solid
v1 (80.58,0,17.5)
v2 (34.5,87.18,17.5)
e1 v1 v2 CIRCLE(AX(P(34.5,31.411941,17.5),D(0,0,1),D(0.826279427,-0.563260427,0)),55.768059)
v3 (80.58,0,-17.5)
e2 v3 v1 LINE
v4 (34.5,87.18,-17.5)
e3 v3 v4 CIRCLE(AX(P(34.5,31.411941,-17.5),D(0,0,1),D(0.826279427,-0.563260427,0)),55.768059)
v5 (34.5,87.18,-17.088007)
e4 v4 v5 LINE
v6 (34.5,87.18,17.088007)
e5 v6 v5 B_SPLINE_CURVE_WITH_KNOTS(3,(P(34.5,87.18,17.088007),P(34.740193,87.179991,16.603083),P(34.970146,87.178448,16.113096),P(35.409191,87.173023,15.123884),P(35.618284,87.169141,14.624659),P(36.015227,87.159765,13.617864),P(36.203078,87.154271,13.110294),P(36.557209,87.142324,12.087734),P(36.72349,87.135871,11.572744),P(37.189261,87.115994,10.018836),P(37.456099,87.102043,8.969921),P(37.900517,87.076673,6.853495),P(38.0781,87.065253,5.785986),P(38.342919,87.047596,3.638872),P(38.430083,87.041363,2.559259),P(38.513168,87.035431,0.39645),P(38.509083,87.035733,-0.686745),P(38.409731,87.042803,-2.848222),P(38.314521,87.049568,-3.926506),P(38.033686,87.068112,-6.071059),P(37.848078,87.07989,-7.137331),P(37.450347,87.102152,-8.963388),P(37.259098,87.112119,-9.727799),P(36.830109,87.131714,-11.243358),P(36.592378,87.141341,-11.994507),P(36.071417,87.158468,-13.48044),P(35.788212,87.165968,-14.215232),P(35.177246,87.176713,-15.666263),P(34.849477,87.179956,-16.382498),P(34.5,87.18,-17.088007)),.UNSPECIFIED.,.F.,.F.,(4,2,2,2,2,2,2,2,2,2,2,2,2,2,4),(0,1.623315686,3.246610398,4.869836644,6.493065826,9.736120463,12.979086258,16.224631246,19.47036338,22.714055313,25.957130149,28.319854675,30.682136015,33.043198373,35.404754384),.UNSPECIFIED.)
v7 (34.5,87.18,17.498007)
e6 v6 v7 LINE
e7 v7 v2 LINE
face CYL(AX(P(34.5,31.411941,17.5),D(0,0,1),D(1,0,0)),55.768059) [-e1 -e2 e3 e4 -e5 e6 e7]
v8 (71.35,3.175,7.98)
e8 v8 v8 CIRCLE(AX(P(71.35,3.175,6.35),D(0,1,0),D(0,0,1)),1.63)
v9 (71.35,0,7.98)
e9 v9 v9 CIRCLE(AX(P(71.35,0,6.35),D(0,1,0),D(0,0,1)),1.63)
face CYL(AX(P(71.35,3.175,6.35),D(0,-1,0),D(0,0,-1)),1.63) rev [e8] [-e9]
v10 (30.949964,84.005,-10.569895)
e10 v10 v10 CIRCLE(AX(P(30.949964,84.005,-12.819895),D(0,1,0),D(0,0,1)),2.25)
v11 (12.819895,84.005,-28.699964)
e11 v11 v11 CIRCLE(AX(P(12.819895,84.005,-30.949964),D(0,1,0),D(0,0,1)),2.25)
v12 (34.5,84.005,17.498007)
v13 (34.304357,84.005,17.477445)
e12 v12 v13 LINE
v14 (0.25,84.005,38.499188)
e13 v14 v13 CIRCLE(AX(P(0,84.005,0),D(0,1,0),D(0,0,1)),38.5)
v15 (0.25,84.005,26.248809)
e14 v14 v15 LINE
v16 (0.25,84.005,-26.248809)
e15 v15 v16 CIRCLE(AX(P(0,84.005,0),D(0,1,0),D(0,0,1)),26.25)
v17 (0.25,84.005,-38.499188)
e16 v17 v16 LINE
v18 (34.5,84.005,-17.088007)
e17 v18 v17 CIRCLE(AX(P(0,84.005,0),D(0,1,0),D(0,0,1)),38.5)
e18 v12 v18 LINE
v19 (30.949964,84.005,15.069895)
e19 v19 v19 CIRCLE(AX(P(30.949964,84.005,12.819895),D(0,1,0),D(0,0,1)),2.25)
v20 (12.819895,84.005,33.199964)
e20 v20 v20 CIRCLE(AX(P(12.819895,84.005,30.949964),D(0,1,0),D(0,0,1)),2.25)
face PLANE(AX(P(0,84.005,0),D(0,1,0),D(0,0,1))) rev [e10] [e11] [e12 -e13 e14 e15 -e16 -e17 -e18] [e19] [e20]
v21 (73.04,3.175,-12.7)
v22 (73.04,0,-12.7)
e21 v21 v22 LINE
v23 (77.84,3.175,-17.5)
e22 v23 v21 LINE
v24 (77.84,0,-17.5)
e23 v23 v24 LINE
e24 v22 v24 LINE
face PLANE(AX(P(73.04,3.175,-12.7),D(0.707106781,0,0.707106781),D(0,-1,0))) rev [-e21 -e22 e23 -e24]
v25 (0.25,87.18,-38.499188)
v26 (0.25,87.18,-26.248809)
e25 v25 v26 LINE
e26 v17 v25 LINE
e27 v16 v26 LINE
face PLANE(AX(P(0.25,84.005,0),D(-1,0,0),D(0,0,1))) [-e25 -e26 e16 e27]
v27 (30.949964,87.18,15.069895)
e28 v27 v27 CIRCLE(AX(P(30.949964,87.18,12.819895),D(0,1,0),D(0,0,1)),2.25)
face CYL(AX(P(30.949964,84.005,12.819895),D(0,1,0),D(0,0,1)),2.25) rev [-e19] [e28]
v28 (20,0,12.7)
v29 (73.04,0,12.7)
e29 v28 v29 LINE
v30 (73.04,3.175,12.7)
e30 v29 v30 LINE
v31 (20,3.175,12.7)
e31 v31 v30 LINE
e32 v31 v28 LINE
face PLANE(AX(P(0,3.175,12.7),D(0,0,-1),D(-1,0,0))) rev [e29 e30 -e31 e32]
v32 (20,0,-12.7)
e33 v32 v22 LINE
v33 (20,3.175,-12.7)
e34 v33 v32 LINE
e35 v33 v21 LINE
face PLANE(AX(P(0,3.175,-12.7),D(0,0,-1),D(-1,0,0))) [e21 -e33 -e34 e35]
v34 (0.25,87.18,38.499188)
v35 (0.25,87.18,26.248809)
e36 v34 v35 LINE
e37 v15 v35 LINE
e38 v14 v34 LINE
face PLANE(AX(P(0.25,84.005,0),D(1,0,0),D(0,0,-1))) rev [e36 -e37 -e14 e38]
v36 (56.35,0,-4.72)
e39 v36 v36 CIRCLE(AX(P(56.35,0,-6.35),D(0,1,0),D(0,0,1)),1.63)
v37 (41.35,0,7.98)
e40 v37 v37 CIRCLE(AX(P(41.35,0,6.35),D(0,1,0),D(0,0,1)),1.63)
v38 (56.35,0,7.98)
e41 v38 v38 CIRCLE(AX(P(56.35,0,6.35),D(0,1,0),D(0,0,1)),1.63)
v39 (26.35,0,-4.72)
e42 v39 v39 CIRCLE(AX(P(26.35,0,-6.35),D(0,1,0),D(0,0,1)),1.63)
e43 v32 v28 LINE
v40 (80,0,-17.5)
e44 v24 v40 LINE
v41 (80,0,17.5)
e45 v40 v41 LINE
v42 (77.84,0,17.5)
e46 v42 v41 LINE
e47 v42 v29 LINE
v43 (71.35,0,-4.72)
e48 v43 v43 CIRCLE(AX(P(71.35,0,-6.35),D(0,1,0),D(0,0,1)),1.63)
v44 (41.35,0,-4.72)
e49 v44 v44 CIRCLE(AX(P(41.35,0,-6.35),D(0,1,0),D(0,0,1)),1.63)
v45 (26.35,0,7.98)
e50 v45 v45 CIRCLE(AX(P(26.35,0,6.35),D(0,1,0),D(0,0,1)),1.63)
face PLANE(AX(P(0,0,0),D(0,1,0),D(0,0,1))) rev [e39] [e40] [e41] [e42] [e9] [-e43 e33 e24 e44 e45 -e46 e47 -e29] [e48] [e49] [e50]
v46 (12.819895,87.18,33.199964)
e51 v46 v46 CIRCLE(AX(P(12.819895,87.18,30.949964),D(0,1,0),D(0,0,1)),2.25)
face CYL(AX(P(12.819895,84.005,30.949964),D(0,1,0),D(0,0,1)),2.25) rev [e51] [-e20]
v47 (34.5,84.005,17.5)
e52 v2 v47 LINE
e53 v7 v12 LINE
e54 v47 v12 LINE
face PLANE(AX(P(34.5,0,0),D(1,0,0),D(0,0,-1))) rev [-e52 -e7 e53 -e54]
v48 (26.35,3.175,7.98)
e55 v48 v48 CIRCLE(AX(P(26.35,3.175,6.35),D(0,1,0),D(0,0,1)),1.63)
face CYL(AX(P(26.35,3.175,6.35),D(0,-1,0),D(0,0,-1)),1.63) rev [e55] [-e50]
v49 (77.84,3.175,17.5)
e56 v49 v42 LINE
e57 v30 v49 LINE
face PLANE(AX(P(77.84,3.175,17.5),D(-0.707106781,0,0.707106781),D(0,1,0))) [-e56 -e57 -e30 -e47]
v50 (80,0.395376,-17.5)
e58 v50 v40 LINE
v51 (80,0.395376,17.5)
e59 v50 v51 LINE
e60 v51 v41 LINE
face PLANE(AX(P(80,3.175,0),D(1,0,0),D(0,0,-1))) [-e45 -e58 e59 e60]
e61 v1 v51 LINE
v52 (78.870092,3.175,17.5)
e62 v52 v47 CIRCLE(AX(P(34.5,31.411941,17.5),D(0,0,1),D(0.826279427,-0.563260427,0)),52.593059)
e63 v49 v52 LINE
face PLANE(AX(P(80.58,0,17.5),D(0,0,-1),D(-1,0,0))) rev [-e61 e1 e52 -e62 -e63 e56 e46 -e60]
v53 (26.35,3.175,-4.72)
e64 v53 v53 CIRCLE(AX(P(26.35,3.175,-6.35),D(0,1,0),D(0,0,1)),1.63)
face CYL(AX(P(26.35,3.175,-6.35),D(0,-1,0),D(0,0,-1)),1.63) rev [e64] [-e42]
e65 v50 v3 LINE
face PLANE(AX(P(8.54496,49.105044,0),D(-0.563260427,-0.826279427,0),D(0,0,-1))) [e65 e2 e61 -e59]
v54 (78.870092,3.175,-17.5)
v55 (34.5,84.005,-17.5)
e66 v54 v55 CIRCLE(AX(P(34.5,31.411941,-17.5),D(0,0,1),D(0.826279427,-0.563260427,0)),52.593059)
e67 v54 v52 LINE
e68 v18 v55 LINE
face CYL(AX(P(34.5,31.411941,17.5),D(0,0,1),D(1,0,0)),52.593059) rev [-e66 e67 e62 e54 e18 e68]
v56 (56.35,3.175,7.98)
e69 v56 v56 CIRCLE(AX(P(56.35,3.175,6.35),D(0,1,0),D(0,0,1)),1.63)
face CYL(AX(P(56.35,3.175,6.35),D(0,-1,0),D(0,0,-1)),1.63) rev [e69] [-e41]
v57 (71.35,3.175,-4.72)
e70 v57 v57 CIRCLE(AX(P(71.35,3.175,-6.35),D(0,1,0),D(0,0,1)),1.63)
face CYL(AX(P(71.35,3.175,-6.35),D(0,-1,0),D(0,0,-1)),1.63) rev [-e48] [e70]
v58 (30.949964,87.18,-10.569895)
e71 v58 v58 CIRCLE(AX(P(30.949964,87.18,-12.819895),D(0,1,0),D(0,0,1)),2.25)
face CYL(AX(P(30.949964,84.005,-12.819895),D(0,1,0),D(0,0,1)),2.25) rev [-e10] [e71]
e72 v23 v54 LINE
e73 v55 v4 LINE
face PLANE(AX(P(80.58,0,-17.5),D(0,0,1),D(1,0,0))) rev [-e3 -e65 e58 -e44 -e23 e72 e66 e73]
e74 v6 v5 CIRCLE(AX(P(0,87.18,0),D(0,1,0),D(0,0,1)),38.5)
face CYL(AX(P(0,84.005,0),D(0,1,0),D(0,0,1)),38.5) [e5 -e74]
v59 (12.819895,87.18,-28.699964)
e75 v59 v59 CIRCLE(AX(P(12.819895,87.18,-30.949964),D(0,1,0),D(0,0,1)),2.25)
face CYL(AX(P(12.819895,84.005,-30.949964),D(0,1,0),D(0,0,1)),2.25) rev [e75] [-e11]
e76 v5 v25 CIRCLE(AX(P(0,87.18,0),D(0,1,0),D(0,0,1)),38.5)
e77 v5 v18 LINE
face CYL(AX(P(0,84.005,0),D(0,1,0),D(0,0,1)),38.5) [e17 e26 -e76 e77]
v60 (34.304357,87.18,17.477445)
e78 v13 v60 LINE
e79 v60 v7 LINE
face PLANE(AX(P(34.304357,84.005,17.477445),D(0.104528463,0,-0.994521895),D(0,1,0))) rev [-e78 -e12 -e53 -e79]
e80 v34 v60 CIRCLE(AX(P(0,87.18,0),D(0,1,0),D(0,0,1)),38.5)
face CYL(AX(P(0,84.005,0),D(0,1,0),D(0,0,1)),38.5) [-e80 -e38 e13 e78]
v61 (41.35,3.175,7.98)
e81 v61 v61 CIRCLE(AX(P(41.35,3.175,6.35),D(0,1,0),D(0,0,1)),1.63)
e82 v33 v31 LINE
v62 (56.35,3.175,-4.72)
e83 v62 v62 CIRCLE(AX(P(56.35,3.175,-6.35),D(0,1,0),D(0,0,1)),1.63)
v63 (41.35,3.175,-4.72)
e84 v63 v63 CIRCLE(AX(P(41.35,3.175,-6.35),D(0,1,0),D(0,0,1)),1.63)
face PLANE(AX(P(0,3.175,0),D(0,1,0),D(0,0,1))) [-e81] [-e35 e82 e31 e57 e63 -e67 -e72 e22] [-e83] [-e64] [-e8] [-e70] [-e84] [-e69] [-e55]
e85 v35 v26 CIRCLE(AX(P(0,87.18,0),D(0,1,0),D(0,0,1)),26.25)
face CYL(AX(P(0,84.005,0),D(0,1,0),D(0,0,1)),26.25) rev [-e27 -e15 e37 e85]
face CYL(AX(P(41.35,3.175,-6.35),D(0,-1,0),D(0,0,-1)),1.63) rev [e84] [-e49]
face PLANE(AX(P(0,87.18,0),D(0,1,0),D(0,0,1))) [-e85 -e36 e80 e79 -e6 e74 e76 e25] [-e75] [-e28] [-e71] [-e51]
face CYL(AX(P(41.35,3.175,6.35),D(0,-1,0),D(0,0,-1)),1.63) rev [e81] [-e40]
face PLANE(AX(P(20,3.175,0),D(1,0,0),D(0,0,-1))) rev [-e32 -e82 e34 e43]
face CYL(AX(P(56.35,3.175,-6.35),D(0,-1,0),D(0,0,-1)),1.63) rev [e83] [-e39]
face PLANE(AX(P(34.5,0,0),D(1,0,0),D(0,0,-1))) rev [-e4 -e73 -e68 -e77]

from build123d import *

# Parameters (mm, degrees)
SKETCH2_R               = 2.25
BOSS_EXTRUDE1_DEPTH     = 3.175
SKETCH1_W               = 2.16
SKETCH1_H               = 4.8
SKETCH1_H_2             = 25.4
SKETCH1_W_2             = 57.84
SKETCH1_R               = 1.63
BOSS_EXTRUDE2_DEPTH     = 3.175
TOP_CONNECTION_SKETCH_W = 35
TOP_CONNECTION_SKETCH_H = 3.175
CHAMFER1_SIZE           = 4.8
CHAMFER2_SIZE           = 0.41
CHAMFER2_SIZE_2         = 0.434896144


# Some blends are built 0.0001 mm under size
with BuildPart() as part:
    # Sketch2 → Boss-Extrude1 (new body)
    with BuildSketch(Plane(origin=(0, 87.18, 0), x_dir=(1, 0, 0), z_dir=(0, 1, 0))):
        with BuildLine():
            ThreePointArc((38.5, 0), (27.3118564, 27.135078773), (0.25, 38.499188303))
            Line((0.25, 38.499188303), (0.25, 26.248809497))
            ThreePointArc((0.25, 26.248809497), (18.649731902, 18.472953202), (26.25, 0))
            ThreePointArc((26.25, 0), (18.649731902, -18.472953202), (0.25, -26.248809497))
            Line((0.25, -26.248809497), (0.25, -38.499188303))
            ThreePointArc((0.25, -38.499188303), (27.3118564, -27.135078773), (38.5, 0))
        make_face()
        with Locations(Location((12.819894984, -30.949964339, 0), (0, 0, 270))):
            Circle(SKETCH2_R, mode=Mode.SUBTRACT)
        with Locations(Location((30.949964339, -12.819894984, 0), (0, 0, 270))):
            Circle(SKETCH2_R, mode=Mode.SUBTRACT)
        with Locations(Location((30.949964339, 12.819894984, 0), (0, 0, 270))):
            Circle(SKETCH2_R, mode=Mode.SUBTRACT)
        with Locations(Location((12.819894984, 30.949964339, 0), (0, 0, 270))):
            Circle(SKETCH2_R, mode=Mode.SUBTRACT)
    extrude(amount=-BOSS_EXTRUDE1_DEPTH)



with BuildPart() as body_2:
    # Sketch1 → Boss-Extrude2 (new body)
    # profile 1 of 4: a face of its own
    with BuildSketch(Plane(origin=(0, 0, 0), x_dir=(1, 0, 0), z_dir=(0, 1, 0))):
        with Locations((78.92, 15.1)):
            Rectangle(SKETCH1_W, SKETCH1_H)
    # profile 2 of 4: a face of its own
    with BuildSketch(Plane(origin=(0, 0, 0), x_dir=(1, 0, 0), z_dir=(0, 1, 0))):
        with Locations((78.92, 0)):
            Rectangle(SKETCH1_W, SKETCH1_H_2)
    # profile 3 of 4: a face of its own
    with BuildSketch(Plane(origin=(0, 0, 0), x_dir=(1, 0, 0), z_dir=(0, 1, 0))):
        with Locations((48.92, 0)):
            Rectangle(SKETCH1_W_2, SKETCH1_H_2)
        with Locations(Location((26.35, -6.35, 0), (0, 0, 270))):
            Circle(SKETCH1_R, mode=Mode.SUBTRACT)
        with Locations(Location((41.35, -6.35, 0), (0, 0, 270))):
            Circle(SKETCH1_R, mode=Mode.SUBTRACT)
        with Locations(Location((56.35, -6.35, 0), (0, 0, 270))):
            Circle(SKETCH1_R, mode=Mode.SUBTRACT)
        with Locations(Location((71.35, -6.35, 0), (0, 0, 270))):
            Circle(SKETCH1_R, mode=Mode.SUBTRACT)
        with Locations(Location((26.35, 6.35, 0), (0, 0, 270))):
            Circle(SKETCH1_R, mode=Mode.SUBTRACT)
        with Locations(Location((41.35, 6.35, 0), (0, 0, 270))):
            Circle(SKETCH1_R, mode=Mode.SUBTRACT)
        with Locations(Location((56.35, 6.35, 0), (0, 0, 270))):
            Circle(SKETCH1_R, mode=Mode.SUBTRACT)
        with Locations(Location((71.35, 6.35, 0), (0, 0, 270))):
            Circle(SKETCH1_R, mode=Mode.SUBTRACT)
    # profile 4 of 4: a face of its own
    with BuildSketch(Plane(origin=(0, 0, 0), x_dir=(1, 0, 0), z_dir=(0, 1, 0))):
        with Locations((78.92, -15.1)):
            Rectangle(SKETCH1_W, SKETCH1_H)
    extrude(amount=BOSS_EXTRUDE2_DEPTH)


with BuildPart() as part_1:
    add(part.part)

    add(body_2.part)  # Sweep2 merges body 2
    # Sweep2: sweep along a curve in space
    with BuildLine() as sweep2_path:
        ThreePointArc((80.58, 0, 17.5), (83.80445923, 57.472384507, 17.5), (34.5, 87.18, 17.5))
    # Top_Connection_Sketch → Sweep2 (sweep)
    with BuildSketch(Plane(origin=(34.5, 0, 0), x_dir=(0, 0, -1), z_dir=(1, 0, 0))):
        with Locations((0, 85.5925)):
            Rectangle(TOP_CONNECTION_SKETCH_W, TOP_CONNECTION_SKETCH_H)
    sweep(path=sweep2_path.line)

    # Chamfer1
    chamfer1_edges = [part_1.edges().sort_by_distance(p)[0] for p in [
        (77.84, 1.5875, -12.7),
        (77.84, 1.5875, 12.7),
    ]]
    chamfer(chamfer1_edges, length=CHAMFER1_SIZE - 0.0001)  # a hair under: the kernel refuses the full size

    # Chamfer2
    # the kernel refuses this chamfer: 0.434896144, 0.41 mm, written as the material it adds along each edge
    with BuildSketch(Plane(origin=(34.5, 84.005, 17.088007491), x_dir=(0.04194571569864223, 0, 0.9991198911714894), z_dir=(0, 1, 0))) as chamfer2_piece_1:
        with BuildLine():
            Line((CHAMFER2_SIZE * 0.999119891171, -CHAMFER2_SIZE * 0.0419457156986), (CHAMFER2_SIZE_2 * 0.873966952265, -CHAMFER2_SIZE_2 * 0.485985357052))
            ThreePointArc((CHAMFER2_SIZE_2 * 0.873966952265, -CHAMFER2_SIZE_2 * 0.485985357052), (0.192993875, -0.106615288), (0, 0))
            Line((0, 0), (CHAMFER2_SIZE * 0.999119891171, -CHAMFER2_SIZE * 0.0419457156986))
        make_face()
    extrude(amount=3.175)


solid = part_1.part
